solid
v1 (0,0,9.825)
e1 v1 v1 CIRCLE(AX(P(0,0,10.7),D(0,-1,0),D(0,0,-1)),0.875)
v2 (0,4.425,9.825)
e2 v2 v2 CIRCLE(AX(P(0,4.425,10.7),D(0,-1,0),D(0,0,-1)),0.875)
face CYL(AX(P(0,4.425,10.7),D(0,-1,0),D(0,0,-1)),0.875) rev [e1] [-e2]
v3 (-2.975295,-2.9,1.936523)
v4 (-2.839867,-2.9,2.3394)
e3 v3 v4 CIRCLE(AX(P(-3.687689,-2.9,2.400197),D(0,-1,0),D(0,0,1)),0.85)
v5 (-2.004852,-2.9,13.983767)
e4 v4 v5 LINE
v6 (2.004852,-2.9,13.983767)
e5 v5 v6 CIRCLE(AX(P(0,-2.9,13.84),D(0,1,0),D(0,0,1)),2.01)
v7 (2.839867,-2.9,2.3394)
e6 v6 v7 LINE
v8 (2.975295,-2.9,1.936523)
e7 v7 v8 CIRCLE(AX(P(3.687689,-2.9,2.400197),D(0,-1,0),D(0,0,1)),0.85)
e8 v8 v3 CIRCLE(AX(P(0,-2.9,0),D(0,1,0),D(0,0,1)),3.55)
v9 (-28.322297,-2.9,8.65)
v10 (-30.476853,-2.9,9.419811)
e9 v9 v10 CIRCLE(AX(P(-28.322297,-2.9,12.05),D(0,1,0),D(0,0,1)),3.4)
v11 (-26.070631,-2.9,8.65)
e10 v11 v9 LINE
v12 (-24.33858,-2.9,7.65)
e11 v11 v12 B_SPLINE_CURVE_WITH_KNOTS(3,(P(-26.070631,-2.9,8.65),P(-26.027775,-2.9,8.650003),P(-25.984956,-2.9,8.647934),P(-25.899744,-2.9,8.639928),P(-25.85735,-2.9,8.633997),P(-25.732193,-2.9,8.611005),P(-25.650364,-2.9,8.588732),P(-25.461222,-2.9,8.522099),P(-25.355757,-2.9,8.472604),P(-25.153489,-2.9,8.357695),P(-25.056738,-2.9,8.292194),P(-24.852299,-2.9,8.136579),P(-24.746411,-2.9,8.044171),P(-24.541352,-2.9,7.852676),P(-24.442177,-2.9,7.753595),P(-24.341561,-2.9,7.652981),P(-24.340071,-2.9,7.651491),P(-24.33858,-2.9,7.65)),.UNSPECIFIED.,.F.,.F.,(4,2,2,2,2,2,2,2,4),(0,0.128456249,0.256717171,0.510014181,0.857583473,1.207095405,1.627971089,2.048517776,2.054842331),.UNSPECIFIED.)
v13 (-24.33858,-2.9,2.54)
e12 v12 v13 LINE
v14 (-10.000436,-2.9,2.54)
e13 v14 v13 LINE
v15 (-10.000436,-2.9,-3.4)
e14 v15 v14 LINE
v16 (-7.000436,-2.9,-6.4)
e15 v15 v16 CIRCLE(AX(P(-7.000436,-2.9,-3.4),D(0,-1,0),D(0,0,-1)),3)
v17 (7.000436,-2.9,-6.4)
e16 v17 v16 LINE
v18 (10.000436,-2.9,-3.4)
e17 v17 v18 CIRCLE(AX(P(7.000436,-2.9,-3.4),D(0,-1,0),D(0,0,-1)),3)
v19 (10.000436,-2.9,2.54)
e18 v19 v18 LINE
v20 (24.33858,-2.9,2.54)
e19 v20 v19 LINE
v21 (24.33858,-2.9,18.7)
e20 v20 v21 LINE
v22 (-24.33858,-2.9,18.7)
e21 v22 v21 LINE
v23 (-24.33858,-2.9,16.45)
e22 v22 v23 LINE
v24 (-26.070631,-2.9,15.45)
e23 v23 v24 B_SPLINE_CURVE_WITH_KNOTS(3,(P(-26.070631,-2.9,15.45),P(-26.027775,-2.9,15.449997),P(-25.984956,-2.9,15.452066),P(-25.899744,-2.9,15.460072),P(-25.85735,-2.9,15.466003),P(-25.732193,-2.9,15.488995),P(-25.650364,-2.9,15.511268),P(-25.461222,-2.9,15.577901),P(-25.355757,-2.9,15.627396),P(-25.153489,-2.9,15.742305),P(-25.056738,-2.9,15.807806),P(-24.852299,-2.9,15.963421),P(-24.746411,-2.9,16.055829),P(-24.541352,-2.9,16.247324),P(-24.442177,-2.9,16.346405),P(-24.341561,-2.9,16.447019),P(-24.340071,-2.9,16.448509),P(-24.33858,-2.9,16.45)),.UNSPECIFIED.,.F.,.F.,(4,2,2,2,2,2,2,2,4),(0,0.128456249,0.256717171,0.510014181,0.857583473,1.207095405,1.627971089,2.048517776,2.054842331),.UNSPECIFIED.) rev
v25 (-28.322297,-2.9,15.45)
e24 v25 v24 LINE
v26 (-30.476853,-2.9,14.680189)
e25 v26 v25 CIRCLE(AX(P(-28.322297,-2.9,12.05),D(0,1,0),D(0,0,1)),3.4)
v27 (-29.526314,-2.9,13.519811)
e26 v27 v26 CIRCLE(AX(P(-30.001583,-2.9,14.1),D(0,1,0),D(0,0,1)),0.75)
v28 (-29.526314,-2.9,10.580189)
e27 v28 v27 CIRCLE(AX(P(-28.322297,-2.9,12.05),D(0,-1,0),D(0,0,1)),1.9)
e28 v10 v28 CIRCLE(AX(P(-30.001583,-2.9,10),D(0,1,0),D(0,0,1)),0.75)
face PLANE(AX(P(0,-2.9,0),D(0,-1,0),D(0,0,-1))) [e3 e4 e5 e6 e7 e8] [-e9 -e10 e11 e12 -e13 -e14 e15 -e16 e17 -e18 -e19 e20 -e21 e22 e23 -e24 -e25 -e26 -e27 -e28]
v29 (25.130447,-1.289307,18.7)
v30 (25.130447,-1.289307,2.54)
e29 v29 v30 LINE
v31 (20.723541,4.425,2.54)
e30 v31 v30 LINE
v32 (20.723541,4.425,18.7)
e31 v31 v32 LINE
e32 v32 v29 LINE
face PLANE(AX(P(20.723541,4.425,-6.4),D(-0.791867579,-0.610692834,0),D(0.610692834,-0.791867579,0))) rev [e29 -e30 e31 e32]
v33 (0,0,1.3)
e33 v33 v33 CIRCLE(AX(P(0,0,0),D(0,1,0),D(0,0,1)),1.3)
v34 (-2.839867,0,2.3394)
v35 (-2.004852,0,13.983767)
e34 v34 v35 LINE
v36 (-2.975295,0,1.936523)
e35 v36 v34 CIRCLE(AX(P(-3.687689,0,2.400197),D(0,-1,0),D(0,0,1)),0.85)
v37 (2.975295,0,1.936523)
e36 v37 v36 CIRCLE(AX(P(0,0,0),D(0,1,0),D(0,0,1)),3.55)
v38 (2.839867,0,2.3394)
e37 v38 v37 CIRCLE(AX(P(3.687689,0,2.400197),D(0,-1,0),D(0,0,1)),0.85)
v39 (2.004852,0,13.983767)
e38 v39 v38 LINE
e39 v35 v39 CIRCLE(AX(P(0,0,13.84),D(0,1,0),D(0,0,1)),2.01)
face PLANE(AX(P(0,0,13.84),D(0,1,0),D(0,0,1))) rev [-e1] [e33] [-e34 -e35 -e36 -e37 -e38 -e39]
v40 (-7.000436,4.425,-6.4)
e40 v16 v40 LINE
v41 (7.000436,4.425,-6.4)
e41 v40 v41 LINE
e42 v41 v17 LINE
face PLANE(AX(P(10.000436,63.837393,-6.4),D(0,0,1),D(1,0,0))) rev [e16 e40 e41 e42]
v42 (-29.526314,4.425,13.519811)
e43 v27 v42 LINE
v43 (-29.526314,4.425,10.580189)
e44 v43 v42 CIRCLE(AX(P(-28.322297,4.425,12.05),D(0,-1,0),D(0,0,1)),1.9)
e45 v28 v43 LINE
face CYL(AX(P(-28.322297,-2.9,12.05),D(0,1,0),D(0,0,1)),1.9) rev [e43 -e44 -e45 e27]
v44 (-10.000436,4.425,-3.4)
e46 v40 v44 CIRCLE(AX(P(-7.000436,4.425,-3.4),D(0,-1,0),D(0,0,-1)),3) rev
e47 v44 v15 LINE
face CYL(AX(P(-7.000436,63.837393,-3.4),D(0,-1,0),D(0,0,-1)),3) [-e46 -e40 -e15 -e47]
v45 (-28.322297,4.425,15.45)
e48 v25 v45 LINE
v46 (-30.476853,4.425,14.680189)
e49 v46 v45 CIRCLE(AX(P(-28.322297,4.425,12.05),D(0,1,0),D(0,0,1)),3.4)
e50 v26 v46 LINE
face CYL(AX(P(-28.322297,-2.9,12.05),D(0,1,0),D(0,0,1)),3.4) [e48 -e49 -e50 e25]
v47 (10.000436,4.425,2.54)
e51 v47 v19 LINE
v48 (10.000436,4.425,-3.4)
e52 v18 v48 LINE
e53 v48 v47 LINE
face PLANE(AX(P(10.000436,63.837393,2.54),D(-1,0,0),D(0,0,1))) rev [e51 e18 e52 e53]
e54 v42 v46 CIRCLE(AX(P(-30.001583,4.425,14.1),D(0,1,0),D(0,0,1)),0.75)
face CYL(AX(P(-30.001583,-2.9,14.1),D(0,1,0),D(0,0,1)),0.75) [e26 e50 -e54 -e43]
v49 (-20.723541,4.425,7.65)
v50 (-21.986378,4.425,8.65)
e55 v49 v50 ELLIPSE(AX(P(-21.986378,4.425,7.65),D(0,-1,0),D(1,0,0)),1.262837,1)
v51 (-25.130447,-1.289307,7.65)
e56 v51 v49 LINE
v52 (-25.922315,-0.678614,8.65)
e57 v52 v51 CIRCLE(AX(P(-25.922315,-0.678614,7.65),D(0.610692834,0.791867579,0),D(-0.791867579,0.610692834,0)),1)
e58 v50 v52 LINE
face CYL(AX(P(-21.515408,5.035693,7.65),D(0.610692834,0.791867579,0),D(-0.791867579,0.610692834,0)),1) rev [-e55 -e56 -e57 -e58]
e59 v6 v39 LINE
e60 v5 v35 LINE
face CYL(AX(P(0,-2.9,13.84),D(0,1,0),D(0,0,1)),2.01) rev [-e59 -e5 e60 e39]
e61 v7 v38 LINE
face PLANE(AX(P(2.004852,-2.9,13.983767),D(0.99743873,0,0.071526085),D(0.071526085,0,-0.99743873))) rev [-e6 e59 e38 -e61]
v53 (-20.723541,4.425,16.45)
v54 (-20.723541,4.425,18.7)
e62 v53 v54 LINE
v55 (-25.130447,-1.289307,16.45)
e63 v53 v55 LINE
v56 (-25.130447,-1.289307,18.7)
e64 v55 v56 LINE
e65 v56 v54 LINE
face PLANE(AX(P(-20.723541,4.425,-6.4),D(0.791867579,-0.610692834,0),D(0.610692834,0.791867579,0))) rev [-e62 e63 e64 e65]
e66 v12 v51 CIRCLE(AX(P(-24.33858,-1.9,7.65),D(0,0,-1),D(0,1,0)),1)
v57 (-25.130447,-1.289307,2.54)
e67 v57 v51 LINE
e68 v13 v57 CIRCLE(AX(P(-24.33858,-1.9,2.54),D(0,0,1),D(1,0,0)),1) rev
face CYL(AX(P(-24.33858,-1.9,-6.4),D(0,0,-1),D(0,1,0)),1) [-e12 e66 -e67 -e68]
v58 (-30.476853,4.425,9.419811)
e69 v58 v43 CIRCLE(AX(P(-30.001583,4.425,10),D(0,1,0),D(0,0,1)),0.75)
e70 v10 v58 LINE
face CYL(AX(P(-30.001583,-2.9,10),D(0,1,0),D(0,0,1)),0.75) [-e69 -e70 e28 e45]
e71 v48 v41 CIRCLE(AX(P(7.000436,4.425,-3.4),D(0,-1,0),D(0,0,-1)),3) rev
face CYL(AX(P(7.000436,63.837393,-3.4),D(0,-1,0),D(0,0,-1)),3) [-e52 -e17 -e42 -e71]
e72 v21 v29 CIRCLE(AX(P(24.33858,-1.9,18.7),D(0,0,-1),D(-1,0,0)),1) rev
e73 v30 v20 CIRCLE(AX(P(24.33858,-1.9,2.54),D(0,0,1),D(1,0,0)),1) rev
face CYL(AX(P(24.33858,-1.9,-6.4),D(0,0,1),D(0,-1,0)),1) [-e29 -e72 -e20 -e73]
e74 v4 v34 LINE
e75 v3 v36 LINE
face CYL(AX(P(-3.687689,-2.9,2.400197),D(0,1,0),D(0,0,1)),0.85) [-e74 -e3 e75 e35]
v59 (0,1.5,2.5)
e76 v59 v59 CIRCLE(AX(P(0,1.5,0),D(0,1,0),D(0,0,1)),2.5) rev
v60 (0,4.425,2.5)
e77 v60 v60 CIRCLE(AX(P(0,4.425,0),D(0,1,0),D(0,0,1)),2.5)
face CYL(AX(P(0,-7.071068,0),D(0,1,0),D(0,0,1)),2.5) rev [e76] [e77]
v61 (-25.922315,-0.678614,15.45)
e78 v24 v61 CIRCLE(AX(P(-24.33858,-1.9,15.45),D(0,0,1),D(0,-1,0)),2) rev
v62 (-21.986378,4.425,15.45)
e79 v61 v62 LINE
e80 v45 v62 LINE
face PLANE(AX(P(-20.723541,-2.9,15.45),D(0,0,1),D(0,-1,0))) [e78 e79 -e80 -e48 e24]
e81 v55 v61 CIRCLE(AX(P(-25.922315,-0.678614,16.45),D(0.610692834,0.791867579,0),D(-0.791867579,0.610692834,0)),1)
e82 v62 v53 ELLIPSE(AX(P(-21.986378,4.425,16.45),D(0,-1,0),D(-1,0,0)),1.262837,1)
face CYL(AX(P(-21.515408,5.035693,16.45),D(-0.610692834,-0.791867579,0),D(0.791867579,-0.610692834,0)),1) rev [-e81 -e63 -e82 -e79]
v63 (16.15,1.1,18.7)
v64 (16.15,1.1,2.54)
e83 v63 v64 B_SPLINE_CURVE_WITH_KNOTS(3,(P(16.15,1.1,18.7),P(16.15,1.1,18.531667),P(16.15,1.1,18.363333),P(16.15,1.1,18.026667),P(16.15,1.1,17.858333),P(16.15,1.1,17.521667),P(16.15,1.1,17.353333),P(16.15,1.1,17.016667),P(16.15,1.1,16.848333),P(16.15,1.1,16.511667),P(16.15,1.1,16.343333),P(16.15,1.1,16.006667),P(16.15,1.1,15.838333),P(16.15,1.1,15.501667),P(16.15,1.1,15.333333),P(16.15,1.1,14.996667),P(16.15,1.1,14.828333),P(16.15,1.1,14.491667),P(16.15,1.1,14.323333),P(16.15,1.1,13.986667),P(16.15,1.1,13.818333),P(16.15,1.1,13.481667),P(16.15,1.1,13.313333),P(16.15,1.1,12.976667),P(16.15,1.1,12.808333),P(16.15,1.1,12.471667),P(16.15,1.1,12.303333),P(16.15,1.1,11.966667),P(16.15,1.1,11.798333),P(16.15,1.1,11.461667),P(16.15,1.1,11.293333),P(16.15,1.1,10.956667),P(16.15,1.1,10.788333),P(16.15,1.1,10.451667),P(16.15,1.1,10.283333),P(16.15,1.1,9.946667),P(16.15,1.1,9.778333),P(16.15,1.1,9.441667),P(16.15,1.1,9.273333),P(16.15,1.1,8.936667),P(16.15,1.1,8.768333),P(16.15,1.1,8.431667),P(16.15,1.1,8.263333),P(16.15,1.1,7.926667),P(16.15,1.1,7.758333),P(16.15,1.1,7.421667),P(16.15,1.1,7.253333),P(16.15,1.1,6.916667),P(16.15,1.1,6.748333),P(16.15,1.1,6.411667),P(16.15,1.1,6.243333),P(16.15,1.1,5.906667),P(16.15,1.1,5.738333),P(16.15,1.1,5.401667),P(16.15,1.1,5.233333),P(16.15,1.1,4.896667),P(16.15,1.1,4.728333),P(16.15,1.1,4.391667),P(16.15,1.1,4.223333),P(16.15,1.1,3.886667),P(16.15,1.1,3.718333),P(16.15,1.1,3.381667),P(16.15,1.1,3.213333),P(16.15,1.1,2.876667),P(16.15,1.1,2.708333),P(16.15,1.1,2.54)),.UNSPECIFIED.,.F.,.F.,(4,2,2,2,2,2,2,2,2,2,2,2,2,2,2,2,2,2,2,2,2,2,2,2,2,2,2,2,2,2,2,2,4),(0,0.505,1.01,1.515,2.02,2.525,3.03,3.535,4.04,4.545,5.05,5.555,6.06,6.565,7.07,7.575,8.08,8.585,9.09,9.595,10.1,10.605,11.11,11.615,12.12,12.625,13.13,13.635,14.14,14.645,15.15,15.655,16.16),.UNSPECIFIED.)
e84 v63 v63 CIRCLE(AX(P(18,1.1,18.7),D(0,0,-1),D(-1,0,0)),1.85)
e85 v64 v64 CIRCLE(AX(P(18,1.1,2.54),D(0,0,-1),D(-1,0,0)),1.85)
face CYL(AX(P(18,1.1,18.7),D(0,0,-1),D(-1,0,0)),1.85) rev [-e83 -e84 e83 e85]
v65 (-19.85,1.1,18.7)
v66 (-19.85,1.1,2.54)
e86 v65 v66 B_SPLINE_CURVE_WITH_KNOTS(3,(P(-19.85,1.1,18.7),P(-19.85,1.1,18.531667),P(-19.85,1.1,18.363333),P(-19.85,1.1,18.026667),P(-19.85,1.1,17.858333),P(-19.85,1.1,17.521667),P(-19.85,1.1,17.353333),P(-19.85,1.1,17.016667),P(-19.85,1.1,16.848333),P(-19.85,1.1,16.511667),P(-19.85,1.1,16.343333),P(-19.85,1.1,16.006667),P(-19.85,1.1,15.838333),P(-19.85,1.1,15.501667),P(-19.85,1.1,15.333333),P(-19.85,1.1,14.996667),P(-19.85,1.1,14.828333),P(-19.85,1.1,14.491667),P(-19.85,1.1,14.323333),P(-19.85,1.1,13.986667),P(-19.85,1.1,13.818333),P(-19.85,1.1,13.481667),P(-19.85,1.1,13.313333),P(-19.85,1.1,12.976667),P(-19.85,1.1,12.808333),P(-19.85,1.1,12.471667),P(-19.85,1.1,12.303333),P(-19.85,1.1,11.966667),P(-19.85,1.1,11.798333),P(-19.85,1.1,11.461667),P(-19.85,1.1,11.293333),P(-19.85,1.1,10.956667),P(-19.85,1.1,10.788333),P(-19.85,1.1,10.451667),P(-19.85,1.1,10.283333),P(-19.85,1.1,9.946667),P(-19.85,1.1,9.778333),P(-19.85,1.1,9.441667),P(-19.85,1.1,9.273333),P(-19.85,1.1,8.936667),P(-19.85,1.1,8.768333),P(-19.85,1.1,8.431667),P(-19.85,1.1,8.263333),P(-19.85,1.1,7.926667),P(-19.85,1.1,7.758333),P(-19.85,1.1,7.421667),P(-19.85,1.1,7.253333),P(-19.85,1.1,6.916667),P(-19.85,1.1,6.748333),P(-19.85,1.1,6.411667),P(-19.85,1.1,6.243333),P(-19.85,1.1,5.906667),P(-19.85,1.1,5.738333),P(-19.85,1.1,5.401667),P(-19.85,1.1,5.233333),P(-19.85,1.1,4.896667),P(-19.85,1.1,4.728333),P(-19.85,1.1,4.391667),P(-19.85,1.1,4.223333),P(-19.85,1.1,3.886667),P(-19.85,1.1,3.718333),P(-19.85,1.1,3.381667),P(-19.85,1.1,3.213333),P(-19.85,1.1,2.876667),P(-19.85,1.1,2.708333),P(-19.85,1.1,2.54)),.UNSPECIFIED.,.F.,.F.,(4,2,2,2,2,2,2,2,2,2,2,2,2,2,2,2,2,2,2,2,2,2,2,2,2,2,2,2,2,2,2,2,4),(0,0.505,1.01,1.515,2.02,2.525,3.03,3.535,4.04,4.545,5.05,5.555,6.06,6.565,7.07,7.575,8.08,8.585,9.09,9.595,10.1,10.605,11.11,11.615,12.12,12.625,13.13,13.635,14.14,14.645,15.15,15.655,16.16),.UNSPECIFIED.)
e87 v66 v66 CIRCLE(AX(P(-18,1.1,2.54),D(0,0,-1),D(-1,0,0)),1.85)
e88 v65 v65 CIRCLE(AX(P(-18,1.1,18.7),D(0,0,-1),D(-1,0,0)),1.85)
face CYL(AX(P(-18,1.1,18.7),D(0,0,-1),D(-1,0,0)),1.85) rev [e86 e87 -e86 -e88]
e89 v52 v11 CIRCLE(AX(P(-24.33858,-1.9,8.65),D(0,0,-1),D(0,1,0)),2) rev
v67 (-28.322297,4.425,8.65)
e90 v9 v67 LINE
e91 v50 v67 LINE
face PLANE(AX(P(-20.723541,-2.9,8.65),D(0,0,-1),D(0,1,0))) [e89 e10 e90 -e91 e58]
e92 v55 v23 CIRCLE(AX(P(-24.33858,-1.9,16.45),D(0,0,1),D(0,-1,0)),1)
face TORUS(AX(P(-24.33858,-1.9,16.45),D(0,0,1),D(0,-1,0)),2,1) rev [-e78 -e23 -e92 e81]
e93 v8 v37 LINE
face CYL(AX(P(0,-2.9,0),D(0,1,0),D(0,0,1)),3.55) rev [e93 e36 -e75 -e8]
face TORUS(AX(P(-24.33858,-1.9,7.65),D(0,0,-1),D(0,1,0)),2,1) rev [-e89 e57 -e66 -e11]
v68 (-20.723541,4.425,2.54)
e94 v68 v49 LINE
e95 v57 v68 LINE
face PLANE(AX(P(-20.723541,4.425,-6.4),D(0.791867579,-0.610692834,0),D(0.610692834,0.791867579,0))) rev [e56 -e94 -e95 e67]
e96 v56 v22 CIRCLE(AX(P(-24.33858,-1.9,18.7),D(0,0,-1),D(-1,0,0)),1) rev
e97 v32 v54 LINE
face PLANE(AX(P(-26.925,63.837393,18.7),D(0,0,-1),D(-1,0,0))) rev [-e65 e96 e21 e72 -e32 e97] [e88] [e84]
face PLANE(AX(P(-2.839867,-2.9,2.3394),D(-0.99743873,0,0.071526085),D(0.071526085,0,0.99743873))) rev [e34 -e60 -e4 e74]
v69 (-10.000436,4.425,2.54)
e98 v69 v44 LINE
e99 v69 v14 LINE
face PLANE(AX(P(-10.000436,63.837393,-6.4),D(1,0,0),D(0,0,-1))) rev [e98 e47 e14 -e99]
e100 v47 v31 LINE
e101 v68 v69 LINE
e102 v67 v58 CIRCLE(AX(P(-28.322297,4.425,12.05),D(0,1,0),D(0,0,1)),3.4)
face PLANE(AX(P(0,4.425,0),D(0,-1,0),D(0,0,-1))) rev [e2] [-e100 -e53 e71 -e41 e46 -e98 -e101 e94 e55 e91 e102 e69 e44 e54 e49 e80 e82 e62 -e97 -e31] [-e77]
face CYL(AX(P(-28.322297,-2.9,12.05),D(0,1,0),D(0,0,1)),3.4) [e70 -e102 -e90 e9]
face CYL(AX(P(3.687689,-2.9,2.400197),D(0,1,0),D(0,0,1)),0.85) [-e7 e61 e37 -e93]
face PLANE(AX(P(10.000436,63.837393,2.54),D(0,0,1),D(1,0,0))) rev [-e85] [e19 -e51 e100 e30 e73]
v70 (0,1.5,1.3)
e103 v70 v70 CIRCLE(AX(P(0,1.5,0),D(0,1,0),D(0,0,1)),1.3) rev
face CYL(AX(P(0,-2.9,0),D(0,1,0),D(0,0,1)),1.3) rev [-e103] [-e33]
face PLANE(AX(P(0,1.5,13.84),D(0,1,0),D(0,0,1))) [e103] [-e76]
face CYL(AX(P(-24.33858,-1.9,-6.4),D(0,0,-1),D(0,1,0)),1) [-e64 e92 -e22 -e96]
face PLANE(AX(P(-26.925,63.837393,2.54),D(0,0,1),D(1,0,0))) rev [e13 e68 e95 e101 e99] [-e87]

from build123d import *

# Parameters (mm, degrees)
BOSS_EXTRUDE1_DEPTH      = 4.425
BOSS_EXTRUDE1_DEPTH_BACK = 2.9
CUT_EXTRUDE1_DEPTH       = 34.079090828
SKETCH6_R                = 1.3
CUT_EXTRUDE2_DEPTH       = 34.590195742
SKETCH7_R                = 2.5
CUT_EXTRUDE3_DEPTH       = 2.925
SKETCH8_R                = 0.875
CUT_EXTRUDE4_DEPTH       = 34.079090828
SKETCH9_R                = 1.85
CUT_EXTRUDE5_DEPTH       = 32.712487288
CUT_EXTRUDE6_DEPTH       = 38.074873567
FILLET1_R                = 1
FILLET2_R                = 3
BOSS_EXTRUDE2_DEPTH      = 7.325
FILLET3_R                = 1


with BuildPart() as part:
    # Sketch4 → Boss-Extrude1 (new, two sides: drawn at the far end of the back side and taken through both)
    with BuildSketch(Plane(origin=(0, 0, 0), x_dir=(1, 0, 0), z_dir=(0, 1, 0)).offset(-BOSS_EXTRUDE1_DEPTH_BACK)):
        Polygon((-26.925, -2.54), (-10.000436291, -2.54), (-10.000436291, 6.4), (10.000436291, 6.4), (10.000436291, -2.54), (26.925, -2.54), (26.925, -18.7), (-26.925, -18.7), align=None)
    extrude(amount=BOSS_EXTRUDE1_DEPTH + BOSS_EXTRUDE1_DEPTH_BACK)

    # Sketch5 → Cut-Extrude1 (cut, through all)
    with BuildSketch(Plane(origin=(0, 0, 0), x_dir=(1, 0, 0), z_dir=(0, 1, 0))):
        with BuildLine():
            Line((2.004851846, -13.98376743), (2.839866559, -2.339399967))
            ThreePointArc((2.839866559, -2.339399967), (2.881992781, -2.129359863), (2.975294921, -1.936522692))
            ThreePointArc((2.975294921, -1.936522692), (0, 3.55), (-2.975294921, -1.936522692))
            ThreePointArc((-2.975294921, -1.936522692), (-2.881992781, -2.129359863), (-2.839866559, -2.339399967))
            Line((-2.839866559, -2.339399967), (-2.004851846, -13.98376743))
            ThreePointArc((-2.004851846, -13.98376743), (0, -15.85), (2.004851846, -13.98376743))
        make_face()
    extrude(amount=-CUT_EXTRUDE1_DEPTH, mode=Mode.SUBTRACT)

    # Sketch6 → Cut-Extrude2 (cut, through all)
    with BuildSketch(Plane(origin=(0, 4.425, 0), x_dir=(1, 0, 0), z_dir=(0, 1, 0))):
        with Locations(Location((0, 0, 0), (0, 0, 270))):
            Circle(SKETCH6_R)
    extrude(amount=-CUT_EXTRUDE2_DEPTH, mode=Mode.SUBTRACT)

    # Sketch7 → Cut-Extrude3 (cut)
    with BuildSketch(Plane(origin=(0, 4.425, 0), x_dir=(1, 0, 0), z_dir=(0, 1, 0))):
        with Locations(Location((0, 0, 0), (0, 0, 270))):
            Circle(SKETCH7_R)
    extrude(amount=-CUT_EXTRUDE3_DEPTH, mode=Mode.SUBTRACT)

    # Sketch8 → Cut-Extrude4 (cut, through all)
    with BuildSketch(Plane.XZ):
        with Locations(Location((0, 10.7, 0), (0, 0, 270))):
            Circle(SKETCH8_R)
    extrude(amount=-CUT_EXTRUDE4_DEPTH, mode=Mode.SUBTRACT)

    # Sketch9 → Cut-Extrude5 (cut, through all)
    with BuildSketch(Plane(origin=(0, 0, 2.54), x_dir=(-1, 0, 0), z_dir=(0, 0, -1))):
        with Locations((18, 1.1)):
            Circle(SKETCH9_R)
        with Locations((-18, 1.1)):
            Circle(SKETCH9_R)
    extrude(amount=-CUT_EXTRUDE5_DEPTH, mode=Mode.SUBTRACT)

    # Sketch11 → Cut-Extrude6 (cut, through all)
    with BuildSketch(Plane.XY.offset(18.7)):
        Polygon((-20.723540873, 4.425), (-26.372623028, -2.9), (-26.925, -2.9), (-26.925, 4.425), align=None)
        Polygon((20.723540873, 4.425), (26.925, 4.425), (26.925, -2.9), (26.372623028, -2.9), align=None)
    extrude(amount=-CUT_EXTRUDE6_DEPTH, mode=Mode.SUBTRACT)

    # Fillet1
    fillet1_edges = [part.edges().sort_by_distance(p)[0] for p in [
        (26.372623028, -2.9, 10.62),
        (-26.372623028, -2.9, 10.62),
    ]]
    fillet(fillet1_edges, radius=FILLET1_R)

    # Fillet2
    fillet2_edges = [part.edges().sort_by_distance(p)[0] for p in [
        (-10.000436291, 0.7625, -6.4),
        (10.000436291, 0.7625, -6.4),
    ]]
    fillet(fillet2_edges, radius=FILLET2_R)

    # Sketch14 → Boss-Extrude2 (add, through all)
    with BuildSketch(Plane(origin=(0, 4.425, 0), x_dir=(1, 0, 0), z_dir=(0, 1, 0))):
        with BuildLine():
            Line((-20.723540873, -8.65), (-28.322297461, -8.65))
            ThreePointArc((-28.322297461, -8.65), (-29.466272656, -8.848231621), (-30.476852522, -9.419811321))
            ThreePointArc((-30.476852522, -9.419811321), (-30.581771703, -10.475269499), (-29.526313525, -10.580188679))
            ThreePointArc((-29.526313525, -10.580188679), (-26.422297461, -12.05), (-29.526313525, -13.519811321))
            ThreePointArc((-29.526313525, -13.519811321), (-30.581771703, -13.624730501), (-30.476852522, -14.680188679))
            ThreePointArc((-30.476852522, -14.680188679), (-29.466272656, -15.251768379), (-28.322297461, -15.45))
            Line((-28.322297461, -15.45), (-20.723540873, -15.45))
            Line((-20.723540873, -15.45), (-20.723540873, -8.65))
        make_face()
    extrude(amount=-BOSS_EXTRUDE2_DEPTH)

    # Fillet3
    # the kernel refuses this fillet: 1 mm, written as the material it adds along each edge
    with BuildSketch(Plane(origin=(-24.338579866, -1.9, 8.65), x_dir=(0.5968522081551058, 0.8023511959362772, 0), z_dir=(-0.8023511959362772, 0.5968522081551058, 0))) as fillet3_piece_1_section:
        with BuildLine():
            CenterArc((1 + FILLET3_R, FILLET3_R), FILLET3_R, 180, 90)
            Line((1, FILLET3_R), (1, 0))
            Line((1, 0), (1 + FILLET3_R, 0))
        make_face()
    fillet3_piece_1 = revolve(axis=Axis((-24.338579866, -1.9, 8.65), (0, 0, -1)), revolution_arc=270.994831495, mode=Mode.PRIVATE)
    fillet3_piece_1 = split(fillet3_piece_1, bisect_by=Plane(origin=(-25.318581696, -2.9, 8.393059432), z_dir=(0, 1, 0)), keep=Keep.TOP, mode=Mode.PRIVATE)
    add(fillet3_piece_1)
    with BuildSketch(Plane(origin=(-24.338579866, -1.9, 15.45), x_dir=(0.5968522081551029, 0.8023511959362795, 0), z_dir=(-0.8023511959362795, 0.5968522081551029, 0))) as fillet3_piece_2_section:
        with BuildLine():
            CenterArc((1 + FILLET3_R, -FILLET3_R), FILLET3_R, 90, 90)
            Line((1 + FILLET3_R, 0), (1, 0))
            Line((1, 0), (1, -FILLET3_R))
        make_face()
    fillet3_piece_2 = revolve(axis=Axis((-24.338579866, -1.9, 15.45), (0, 0, -1)), revolution_arc=270.994831495, mode=Mode.PRIVATE)
    fillet3_piece_2 = split(fillet3_piece_2, bisect_by=Plane(origin=(-25.318581739, -2.9, 15.706940487), z_dir=(0, 1, 0)), keep=Keep.TOP, mode=Mode.PRIVATE)
    add(fillet3_piece_2)
    with BuildSketch(Plane(origin=(-25.130447445, -1.289307166, 15.45), x_dir=(0, 0, 1), z_dir=(0.6106928339923638, 0.7918675788983757, 0))) as fillet3_piece_3_section:
        with BuildLine():
            CenterArc((FILLET3_R, -FILLET3_R), FILLET3_R, 90, 90)
            Line((0, -FILLET3_R), (0, 0))
            Line((0, 0), (FILLET3_R, 0))
        make_face()
    fillet3_piece_3 = extrude(amount=9.716240844, mode=Mode.PRIVATE)
    fillet3_piece_3 = split(fillet3_piece_3, bisect_by=Plane(origin=(-23.152517153, 4.425, 15.675632439), z_dir=(0, -1, 0)), keep=Keep.TOP, mode=Mode.PRIVATE)
    add(fillet3_piece_3)
    with BuildSketch(Plane(origin=(-19.196808788, 6.404668947, 8.65), x_dir=(0, 0, -1), z_dir=(-0.6106928339923638, -0.7918675788983757, 0))) as fillet3_piece_4_section:
        with BuildLine():
            CenterArc((FILLET3_R, -FILLET3_R), FILLET3_R, 90, 90)
            Line((0, -FILLET3_R), (0, 0))
            Line((0, 0), (FILLET3_R, 0))
        make_face()
    fillet3_piece_4 = extrude(amount=9.716240844, mode=Mode.PRIVATE)
    fillet3_piece_4 = split(fillet3_piece_4, bisect_by=Plane(origin=(-23.152517153, 4.425, 8.424367561), z_dir=(0, -1, 0)), keep=Keep.TOP, mode=Mode.PRIVATE)
    add(fillet3_piece_4)


solid = part.part
